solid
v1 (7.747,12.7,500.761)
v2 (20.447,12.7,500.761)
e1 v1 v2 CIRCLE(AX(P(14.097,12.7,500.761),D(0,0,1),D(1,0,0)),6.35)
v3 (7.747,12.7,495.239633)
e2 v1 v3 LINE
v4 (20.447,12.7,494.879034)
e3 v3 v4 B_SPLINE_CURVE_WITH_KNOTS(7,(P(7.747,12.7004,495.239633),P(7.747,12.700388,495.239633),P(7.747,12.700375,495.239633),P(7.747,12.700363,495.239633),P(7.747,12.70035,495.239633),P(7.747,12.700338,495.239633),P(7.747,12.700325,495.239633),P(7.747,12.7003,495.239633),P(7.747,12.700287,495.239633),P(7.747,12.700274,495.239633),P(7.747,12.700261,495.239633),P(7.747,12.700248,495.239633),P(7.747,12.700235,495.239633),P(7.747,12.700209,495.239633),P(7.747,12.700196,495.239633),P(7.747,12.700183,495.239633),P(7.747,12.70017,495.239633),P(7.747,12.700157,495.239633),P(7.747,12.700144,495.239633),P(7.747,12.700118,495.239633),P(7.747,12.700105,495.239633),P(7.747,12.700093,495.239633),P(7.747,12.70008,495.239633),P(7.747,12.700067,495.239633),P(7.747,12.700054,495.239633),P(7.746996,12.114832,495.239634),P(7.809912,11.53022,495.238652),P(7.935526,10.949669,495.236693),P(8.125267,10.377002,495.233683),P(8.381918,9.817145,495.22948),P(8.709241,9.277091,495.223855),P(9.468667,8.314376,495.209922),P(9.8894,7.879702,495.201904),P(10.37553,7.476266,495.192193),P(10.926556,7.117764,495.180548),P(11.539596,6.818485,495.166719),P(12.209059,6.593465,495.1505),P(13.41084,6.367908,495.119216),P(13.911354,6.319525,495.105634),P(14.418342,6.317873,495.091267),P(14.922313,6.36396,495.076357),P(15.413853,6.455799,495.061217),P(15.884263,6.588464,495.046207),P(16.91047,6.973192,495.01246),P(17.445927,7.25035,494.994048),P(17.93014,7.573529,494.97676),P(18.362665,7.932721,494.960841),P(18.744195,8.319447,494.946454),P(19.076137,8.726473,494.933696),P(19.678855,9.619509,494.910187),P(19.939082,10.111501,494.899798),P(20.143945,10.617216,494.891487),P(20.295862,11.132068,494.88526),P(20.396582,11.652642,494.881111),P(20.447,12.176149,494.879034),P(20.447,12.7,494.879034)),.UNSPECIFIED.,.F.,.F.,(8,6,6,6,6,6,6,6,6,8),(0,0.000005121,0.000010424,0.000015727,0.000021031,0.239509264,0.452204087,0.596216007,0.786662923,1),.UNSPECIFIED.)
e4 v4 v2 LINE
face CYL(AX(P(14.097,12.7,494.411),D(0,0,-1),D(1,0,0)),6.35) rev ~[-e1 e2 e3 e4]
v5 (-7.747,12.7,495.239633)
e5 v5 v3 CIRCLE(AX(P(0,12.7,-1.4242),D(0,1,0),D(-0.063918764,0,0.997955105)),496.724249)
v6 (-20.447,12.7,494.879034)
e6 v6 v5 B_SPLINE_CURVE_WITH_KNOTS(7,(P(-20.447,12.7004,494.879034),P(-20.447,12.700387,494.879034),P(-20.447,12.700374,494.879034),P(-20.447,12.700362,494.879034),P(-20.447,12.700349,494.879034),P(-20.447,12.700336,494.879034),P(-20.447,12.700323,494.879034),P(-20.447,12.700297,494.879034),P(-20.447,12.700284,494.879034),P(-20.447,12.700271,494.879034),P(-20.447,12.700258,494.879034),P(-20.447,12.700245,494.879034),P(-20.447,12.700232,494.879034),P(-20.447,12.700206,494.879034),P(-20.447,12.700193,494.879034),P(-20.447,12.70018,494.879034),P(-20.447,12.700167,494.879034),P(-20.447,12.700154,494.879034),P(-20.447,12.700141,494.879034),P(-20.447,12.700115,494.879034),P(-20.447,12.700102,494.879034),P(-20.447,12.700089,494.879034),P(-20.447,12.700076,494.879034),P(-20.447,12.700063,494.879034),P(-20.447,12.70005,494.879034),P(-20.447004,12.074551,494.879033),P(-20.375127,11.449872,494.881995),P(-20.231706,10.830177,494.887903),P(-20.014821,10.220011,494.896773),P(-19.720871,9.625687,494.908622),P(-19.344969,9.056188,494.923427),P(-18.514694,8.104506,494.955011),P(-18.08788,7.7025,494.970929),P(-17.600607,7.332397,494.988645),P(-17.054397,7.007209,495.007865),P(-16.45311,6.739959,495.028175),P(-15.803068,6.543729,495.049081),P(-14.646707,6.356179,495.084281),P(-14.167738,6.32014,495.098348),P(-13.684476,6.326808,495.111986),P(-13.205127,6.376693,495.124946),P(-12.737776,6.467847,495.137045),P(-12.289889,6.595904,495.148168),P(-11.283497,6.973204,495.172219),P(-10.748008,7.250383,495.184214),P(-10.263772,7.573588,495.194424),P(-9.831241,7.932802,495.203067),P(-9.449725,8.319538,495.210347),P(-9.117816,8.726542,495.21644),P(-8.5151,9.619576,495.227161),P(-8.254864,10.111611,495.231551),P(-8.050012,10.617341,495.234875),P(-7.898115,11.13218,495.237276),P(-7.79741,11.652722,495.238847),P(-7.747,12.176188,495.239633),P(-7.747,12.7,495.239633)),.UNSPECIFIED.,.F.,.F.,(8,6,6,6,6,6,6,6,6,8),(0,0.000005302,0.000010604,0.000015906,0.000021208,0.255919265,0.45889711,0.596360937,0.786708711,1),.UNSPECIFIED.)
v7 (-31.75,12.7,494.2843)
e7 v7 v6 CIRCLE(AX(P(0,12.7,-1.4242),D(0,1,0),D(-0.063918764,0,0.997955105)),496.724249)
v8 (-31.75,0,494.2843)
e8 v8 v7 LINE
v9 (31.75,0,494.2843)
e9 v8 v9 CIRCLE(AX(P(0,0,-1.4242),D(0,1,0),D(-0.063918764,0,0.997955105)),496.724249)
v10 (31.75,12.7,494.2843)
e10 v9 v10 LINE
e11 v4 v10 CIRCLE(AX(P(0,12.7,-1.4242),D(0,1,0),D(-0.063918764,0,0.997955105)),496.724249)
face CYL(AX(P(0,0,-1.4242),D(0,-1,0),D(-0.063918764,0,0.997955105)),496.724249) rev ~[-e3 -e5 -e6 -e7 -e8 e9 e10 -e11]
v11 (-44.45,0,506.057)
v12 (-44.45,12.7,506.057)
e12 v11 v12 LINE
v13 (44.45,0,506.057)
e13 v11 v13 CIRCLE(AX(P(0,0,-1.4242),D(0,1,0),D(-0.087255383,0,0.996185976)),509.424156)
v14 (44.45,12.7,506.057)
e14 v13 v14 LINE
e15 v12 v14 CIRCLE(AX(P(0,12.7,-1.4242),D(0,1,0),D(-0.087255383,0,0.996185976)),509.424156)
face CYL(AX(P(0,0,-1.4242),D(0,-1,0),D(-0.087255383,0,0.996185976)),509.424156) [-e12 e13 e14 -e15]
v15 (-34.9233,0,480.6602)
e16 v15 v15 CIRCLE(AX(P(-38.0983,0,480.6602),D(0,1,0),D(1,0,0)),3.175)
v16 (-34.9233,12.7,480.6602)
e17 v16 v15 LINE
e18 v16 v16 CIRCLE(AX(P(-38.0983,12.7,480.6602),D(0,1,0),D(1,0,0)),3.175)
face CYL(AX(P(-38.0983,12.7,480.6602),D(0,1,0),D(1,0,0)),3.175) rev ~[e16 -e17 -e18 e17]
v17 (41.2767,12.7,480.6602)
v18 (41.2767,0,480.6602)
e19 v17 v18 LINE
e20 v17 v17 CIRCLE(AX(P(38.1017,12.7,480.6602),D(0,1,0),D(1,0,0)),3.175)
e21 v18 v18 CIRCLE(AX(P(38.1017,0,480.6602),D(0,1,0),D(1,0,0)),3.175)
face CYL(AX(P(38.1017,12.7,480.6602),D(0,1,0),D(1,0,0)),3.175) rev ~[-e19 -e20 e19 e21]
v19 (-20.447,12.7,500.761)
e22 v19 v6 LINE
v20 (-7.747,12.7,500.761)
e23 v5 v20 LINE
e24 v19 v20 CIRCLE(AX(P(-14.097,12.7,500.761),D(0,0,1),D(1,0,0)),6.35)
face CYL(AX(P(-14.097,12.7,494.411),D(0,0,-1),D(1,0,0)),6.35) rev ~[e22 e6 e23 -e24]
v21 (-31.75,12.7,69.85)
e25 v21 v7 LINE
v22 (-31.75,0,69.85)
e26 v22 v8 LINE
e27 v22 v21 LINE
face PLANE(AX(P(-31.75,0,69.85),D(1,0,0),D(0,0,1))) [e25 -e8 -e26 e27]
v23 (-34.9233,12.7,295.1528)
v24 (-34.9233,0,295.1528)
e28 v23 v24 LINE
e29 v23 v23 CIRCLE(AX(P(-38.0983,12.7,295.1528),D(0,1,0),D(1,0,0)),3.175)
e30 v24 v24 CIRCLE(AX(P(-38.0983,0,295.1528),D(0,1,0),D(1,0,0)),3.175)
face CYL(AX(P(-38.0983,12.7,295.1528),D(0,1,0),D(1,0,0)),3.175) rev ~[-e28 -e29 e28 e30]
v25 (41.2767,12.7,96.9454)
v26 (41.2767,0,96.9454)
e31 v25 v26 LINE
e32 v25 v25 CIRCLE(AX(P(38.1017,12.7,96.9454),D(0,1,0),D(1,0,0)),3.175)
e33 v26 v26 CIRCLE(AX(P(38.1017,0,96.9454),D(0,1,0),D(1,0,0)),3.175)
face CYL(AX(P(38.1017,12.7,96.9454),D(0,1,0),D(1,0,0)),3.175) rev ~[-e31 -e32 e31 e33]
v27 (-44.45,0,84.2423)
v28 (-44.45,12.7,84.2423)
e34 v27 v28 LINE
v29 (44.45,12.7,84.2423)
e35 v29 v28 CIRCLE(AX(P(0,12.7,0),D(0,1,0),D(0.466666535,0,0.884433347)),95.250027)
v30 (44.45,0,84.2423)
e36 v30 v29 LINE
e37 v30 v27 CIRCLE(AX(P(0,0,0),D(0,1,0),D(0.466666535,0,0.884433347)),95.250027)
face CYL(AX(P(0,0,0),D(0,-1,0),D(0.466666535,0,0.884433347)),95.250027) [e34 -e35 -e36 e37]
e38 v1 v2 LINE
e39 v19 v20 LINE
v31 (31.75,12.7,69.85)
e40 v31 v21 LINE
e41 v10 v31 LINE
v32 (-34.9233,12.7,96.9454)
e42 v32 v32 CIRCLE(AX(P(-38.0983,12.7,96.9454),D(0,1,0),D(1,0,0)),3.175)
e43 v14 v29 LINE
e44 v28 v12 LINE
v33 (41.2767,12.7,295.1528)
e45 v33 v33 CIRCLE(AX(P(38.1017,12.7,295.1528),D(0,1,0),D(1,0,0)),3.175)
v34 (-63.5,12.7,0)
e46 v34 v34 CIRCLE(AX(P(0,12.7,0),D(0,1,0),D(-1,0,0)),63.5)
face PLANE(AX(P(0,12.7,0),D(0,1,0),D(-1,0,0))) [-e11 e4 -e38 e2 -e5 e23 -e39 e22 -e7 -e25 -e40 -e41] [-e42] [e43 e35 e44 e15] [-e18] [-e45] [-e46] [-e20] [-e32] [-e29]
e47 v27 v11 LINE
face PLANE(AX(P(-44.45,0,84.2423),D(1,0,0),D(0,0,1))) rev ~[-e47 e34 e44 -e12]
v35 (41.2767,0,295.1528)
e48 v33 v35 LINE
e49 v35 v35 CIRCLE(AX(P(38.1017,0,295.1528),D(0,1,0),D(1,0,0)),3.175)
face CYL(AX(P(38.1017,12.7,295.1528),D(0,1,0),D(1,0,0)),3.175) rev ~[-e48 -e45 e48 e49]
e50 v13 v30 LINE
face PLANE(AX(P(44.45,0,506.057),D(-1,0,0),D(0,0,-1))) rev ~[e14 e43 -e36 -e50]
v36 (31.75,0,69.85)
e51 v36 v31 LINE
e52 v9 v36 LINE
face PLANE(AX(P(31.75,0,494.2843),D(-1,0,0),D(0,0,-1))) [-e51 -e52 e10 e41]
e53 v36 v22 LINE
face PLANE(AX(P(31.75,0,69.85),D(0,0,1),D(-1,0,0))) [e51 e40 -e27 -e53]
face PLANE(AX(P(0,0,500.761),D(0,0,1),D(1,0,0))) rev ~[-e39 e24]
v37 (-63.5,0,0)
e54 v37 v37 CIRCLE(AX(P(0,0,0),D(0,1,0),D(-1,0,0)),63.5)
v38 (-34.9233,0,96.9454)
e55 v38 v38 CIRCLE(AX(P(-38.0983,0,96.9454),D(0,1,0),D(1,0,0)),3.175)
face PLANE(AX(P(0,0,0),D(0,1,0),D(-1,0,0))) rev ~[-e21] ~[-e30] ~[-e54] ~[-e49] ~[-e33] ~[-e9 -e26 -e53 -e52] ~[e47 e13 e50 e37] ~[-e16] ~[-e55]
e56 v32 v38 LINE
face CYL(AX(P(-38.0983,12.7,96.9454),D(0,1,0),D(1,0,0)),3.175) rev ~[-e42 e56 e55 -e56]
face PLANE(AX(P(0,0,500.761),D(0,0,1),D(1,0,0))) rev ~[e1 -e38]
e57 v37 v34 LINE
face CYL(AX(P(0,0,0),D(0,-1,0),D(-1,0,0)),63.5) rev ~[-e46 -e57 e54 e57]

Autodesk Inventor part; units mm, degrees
ref_plane "YZ Plane" through (0, 0, 0) normal (1, 0, 0) x (0, 1, 0)
ref_plane "XZ Plane" through (0, 0, 0) normal (0, 1, 0) x (-1, 0, 0)
sketch "Sketch2" plane through (0, 0, 0) normal (0, 1, 0) x (-1, 0, 0)
  arc A0 (44.45, 506.057) -> (-44.45, 506.057) centre (0, -1.4242) ccw construction
  arc A1 (44.45, 506.057) -> (-44.45, 506.057) centre (0, -1.4242) ccw
  line L0 (44.45, 84.2423) -> (44.45, 506.057)
  line L1 (-44.45, 506.057) -> (-44.45, 84.2423)
  circle A2 centre (0, 0) radius 57.15 construction
  circle A3 centre (0, 0) radius 63.5
  arc A4 (-44.45, 84.2423) -> (44.45, 84.2423) centre (0, 0) ccw
  line L2 (0, 0) -> (0, 508) construction
  arc A5 (31.75, 494.2843) -> (-31.75, 494.2843) centre (0, -1.4242) ccw
  line L3 (-31.75, 494.2843) -> (-31.75, 69.85)
  arc A6 (-31.75, 77.0401) -> (31.75, 77.0401) centre (0, 0) ccw construction
  line L4 (31.75, 69.85) -> (31.75, 494.2843)
  arc A7 (31.75, 62.217) -> (-31.75, 62.217) centre (0, 0) ccw construction
  line L5 (0, 69.85) -> (0, 63.5) construction
  line L6 (-31.75, 69.85) -> (31.75, 69.85)
  point P0 (-7.0927, 251.5509)
  dimension "d23" = 127
  dimension "d21" = 88.9
  dimension "d22" = 114.3
  dimension "d24" = 190.5
  dimension "d25" = 508
  dimension "d26" = 88.9
  dimension "d29" = 12.7
  dimension "d31" = 139.7
  dimension "d69" = 12.7
  dimension "d70" = 12.7
extrude "Extrusion2" add sketch "Sketch2" along normal blind 12.7
sketch "Sketch3" plane through (0, 12.7, 0) normal (0, 1, 0) x (1, 0, 0)
  arc A0 (-44.4483, -506.0602) -> (44.4517, -506.0602) centre (0.0017, 1.4211) ccw construction
  line L0 (44.4517, -506.0602) -> (44.4517, -84.2454) construction
  line L1 (-44.4483, -506.0602) -> (44.4517, -506.0602) construction
  line L2 (44.4517, -506.0602) -> (44.4517, -84.2454) construction
  line L3 (44.4517, -84.2454) -> (-44.4483, -84.2454) construction
  line L4 (-44.4483, -84.2454) -> (-44.4483, -506.0602) construction
  line L5 (-44.4483, -84.2454) -> (-44.4483, -506.0602) construction
  line L6 (-44.4483, -295.1528) -> (-38.0983, -295.1528) construction
  line L7 (-38.0983, -295.1528) -> (-38.0983, -506.0602) construction
  line L8 (-38.0983, -295.1528) -> (-38.0983, -84.2454) construction
  circle A1 centre (-38.0983, -96.9454) radius 3.175
  circle A2 centre (-38.0983, -480.6602) radius 3.175
  circle A3 centre (-38.0983, -295.1528) radius 3.175
  line L9 (0.0017, -506.0602) -> (0.0017, 1.4211) construction
  circle A4 centre (38.1017, -295.1528) radius 3.175
  line L10 (44.4517, -295.1528) -> (38.1017, -295.1528) construction
  circle A5 centre (38.1017, -96.9454) radius 3.175
  circle A6 centre (38.1017, -480.6602) radius 3.175
  line L11 (38.1017, -295.1528) -> (38.1017, -506.0602) construction
  line L12 (38.1017, -295.1528) -> (38.1017, -84.2454) construction
  line L13 (44.4517, -84.2454) -> (44.4517, -506.0602) construction
  line L14 (44.4517, -84.2454) -> (44.4517, -506.0602) construction
  point P0 (0, 0)
  dimension "d54" = 6.35
  dimension "d55" = 90
  dimension "d56" = 6.35
  dimension "d57" = 12.7
  dimension "d58" = 6.35
  dimension "d59" = 6.35
  dimension "d60" = 25.4
extrude "Extrusion3" cut sketch "Sketch3" against normal blind 12.7
ref_plane "Work Plane2" through (0, 0, 494.411) normal (0, 0, 1) x (1, 0, 0)
sketch "Sketch5" plane through (0, 0, 494.411) normal (0, 0, 1) x (1, 0, 0)
  line L0 (-28.194, 25.4) -> (-28.194, 12.7) construction
  line L1 (-28.194, 25.4) -> (-15.494, 25.4) construction
  line L2 (-28.194, 12.7) -> (28.194, 12.7) construction
  line L3 (0, 12.7) -> (-28.194, 12.7) construction
  circle A0 centre (-14.097, 12.7) radius 6.35
  line L4 (0, 12.7) -> (0, 25.4) construction
  circle A1 centre (14.097, 12.7) radius 6.35
  line L5 (95.25, 12.7) -> (-95.25, 12.7) construction
  line L6 (95.25, 12.7) -> (-95.25, 12.7) construction
  line L7 (0, 12.7) -> (0, 0) construction
  line L8 (95.25, 0) -> (-95.25, 0) construction
  point P0 (44.45, 12.7)
  point P1 (44.45, 0)
  point P2 (-44.45, 0)
  dimension "d62" = 12.7
  dimension "d63" = 90
  dimension "d64" = 56.388
  dimension "d65" = 90
  dimension "d66" = 12.7
extrude "Extrusion5" cut sketch "Sketch5" along normal blind 6.35
equation "\"d26\" = d21"
properties part number "Arm Layer 2"
